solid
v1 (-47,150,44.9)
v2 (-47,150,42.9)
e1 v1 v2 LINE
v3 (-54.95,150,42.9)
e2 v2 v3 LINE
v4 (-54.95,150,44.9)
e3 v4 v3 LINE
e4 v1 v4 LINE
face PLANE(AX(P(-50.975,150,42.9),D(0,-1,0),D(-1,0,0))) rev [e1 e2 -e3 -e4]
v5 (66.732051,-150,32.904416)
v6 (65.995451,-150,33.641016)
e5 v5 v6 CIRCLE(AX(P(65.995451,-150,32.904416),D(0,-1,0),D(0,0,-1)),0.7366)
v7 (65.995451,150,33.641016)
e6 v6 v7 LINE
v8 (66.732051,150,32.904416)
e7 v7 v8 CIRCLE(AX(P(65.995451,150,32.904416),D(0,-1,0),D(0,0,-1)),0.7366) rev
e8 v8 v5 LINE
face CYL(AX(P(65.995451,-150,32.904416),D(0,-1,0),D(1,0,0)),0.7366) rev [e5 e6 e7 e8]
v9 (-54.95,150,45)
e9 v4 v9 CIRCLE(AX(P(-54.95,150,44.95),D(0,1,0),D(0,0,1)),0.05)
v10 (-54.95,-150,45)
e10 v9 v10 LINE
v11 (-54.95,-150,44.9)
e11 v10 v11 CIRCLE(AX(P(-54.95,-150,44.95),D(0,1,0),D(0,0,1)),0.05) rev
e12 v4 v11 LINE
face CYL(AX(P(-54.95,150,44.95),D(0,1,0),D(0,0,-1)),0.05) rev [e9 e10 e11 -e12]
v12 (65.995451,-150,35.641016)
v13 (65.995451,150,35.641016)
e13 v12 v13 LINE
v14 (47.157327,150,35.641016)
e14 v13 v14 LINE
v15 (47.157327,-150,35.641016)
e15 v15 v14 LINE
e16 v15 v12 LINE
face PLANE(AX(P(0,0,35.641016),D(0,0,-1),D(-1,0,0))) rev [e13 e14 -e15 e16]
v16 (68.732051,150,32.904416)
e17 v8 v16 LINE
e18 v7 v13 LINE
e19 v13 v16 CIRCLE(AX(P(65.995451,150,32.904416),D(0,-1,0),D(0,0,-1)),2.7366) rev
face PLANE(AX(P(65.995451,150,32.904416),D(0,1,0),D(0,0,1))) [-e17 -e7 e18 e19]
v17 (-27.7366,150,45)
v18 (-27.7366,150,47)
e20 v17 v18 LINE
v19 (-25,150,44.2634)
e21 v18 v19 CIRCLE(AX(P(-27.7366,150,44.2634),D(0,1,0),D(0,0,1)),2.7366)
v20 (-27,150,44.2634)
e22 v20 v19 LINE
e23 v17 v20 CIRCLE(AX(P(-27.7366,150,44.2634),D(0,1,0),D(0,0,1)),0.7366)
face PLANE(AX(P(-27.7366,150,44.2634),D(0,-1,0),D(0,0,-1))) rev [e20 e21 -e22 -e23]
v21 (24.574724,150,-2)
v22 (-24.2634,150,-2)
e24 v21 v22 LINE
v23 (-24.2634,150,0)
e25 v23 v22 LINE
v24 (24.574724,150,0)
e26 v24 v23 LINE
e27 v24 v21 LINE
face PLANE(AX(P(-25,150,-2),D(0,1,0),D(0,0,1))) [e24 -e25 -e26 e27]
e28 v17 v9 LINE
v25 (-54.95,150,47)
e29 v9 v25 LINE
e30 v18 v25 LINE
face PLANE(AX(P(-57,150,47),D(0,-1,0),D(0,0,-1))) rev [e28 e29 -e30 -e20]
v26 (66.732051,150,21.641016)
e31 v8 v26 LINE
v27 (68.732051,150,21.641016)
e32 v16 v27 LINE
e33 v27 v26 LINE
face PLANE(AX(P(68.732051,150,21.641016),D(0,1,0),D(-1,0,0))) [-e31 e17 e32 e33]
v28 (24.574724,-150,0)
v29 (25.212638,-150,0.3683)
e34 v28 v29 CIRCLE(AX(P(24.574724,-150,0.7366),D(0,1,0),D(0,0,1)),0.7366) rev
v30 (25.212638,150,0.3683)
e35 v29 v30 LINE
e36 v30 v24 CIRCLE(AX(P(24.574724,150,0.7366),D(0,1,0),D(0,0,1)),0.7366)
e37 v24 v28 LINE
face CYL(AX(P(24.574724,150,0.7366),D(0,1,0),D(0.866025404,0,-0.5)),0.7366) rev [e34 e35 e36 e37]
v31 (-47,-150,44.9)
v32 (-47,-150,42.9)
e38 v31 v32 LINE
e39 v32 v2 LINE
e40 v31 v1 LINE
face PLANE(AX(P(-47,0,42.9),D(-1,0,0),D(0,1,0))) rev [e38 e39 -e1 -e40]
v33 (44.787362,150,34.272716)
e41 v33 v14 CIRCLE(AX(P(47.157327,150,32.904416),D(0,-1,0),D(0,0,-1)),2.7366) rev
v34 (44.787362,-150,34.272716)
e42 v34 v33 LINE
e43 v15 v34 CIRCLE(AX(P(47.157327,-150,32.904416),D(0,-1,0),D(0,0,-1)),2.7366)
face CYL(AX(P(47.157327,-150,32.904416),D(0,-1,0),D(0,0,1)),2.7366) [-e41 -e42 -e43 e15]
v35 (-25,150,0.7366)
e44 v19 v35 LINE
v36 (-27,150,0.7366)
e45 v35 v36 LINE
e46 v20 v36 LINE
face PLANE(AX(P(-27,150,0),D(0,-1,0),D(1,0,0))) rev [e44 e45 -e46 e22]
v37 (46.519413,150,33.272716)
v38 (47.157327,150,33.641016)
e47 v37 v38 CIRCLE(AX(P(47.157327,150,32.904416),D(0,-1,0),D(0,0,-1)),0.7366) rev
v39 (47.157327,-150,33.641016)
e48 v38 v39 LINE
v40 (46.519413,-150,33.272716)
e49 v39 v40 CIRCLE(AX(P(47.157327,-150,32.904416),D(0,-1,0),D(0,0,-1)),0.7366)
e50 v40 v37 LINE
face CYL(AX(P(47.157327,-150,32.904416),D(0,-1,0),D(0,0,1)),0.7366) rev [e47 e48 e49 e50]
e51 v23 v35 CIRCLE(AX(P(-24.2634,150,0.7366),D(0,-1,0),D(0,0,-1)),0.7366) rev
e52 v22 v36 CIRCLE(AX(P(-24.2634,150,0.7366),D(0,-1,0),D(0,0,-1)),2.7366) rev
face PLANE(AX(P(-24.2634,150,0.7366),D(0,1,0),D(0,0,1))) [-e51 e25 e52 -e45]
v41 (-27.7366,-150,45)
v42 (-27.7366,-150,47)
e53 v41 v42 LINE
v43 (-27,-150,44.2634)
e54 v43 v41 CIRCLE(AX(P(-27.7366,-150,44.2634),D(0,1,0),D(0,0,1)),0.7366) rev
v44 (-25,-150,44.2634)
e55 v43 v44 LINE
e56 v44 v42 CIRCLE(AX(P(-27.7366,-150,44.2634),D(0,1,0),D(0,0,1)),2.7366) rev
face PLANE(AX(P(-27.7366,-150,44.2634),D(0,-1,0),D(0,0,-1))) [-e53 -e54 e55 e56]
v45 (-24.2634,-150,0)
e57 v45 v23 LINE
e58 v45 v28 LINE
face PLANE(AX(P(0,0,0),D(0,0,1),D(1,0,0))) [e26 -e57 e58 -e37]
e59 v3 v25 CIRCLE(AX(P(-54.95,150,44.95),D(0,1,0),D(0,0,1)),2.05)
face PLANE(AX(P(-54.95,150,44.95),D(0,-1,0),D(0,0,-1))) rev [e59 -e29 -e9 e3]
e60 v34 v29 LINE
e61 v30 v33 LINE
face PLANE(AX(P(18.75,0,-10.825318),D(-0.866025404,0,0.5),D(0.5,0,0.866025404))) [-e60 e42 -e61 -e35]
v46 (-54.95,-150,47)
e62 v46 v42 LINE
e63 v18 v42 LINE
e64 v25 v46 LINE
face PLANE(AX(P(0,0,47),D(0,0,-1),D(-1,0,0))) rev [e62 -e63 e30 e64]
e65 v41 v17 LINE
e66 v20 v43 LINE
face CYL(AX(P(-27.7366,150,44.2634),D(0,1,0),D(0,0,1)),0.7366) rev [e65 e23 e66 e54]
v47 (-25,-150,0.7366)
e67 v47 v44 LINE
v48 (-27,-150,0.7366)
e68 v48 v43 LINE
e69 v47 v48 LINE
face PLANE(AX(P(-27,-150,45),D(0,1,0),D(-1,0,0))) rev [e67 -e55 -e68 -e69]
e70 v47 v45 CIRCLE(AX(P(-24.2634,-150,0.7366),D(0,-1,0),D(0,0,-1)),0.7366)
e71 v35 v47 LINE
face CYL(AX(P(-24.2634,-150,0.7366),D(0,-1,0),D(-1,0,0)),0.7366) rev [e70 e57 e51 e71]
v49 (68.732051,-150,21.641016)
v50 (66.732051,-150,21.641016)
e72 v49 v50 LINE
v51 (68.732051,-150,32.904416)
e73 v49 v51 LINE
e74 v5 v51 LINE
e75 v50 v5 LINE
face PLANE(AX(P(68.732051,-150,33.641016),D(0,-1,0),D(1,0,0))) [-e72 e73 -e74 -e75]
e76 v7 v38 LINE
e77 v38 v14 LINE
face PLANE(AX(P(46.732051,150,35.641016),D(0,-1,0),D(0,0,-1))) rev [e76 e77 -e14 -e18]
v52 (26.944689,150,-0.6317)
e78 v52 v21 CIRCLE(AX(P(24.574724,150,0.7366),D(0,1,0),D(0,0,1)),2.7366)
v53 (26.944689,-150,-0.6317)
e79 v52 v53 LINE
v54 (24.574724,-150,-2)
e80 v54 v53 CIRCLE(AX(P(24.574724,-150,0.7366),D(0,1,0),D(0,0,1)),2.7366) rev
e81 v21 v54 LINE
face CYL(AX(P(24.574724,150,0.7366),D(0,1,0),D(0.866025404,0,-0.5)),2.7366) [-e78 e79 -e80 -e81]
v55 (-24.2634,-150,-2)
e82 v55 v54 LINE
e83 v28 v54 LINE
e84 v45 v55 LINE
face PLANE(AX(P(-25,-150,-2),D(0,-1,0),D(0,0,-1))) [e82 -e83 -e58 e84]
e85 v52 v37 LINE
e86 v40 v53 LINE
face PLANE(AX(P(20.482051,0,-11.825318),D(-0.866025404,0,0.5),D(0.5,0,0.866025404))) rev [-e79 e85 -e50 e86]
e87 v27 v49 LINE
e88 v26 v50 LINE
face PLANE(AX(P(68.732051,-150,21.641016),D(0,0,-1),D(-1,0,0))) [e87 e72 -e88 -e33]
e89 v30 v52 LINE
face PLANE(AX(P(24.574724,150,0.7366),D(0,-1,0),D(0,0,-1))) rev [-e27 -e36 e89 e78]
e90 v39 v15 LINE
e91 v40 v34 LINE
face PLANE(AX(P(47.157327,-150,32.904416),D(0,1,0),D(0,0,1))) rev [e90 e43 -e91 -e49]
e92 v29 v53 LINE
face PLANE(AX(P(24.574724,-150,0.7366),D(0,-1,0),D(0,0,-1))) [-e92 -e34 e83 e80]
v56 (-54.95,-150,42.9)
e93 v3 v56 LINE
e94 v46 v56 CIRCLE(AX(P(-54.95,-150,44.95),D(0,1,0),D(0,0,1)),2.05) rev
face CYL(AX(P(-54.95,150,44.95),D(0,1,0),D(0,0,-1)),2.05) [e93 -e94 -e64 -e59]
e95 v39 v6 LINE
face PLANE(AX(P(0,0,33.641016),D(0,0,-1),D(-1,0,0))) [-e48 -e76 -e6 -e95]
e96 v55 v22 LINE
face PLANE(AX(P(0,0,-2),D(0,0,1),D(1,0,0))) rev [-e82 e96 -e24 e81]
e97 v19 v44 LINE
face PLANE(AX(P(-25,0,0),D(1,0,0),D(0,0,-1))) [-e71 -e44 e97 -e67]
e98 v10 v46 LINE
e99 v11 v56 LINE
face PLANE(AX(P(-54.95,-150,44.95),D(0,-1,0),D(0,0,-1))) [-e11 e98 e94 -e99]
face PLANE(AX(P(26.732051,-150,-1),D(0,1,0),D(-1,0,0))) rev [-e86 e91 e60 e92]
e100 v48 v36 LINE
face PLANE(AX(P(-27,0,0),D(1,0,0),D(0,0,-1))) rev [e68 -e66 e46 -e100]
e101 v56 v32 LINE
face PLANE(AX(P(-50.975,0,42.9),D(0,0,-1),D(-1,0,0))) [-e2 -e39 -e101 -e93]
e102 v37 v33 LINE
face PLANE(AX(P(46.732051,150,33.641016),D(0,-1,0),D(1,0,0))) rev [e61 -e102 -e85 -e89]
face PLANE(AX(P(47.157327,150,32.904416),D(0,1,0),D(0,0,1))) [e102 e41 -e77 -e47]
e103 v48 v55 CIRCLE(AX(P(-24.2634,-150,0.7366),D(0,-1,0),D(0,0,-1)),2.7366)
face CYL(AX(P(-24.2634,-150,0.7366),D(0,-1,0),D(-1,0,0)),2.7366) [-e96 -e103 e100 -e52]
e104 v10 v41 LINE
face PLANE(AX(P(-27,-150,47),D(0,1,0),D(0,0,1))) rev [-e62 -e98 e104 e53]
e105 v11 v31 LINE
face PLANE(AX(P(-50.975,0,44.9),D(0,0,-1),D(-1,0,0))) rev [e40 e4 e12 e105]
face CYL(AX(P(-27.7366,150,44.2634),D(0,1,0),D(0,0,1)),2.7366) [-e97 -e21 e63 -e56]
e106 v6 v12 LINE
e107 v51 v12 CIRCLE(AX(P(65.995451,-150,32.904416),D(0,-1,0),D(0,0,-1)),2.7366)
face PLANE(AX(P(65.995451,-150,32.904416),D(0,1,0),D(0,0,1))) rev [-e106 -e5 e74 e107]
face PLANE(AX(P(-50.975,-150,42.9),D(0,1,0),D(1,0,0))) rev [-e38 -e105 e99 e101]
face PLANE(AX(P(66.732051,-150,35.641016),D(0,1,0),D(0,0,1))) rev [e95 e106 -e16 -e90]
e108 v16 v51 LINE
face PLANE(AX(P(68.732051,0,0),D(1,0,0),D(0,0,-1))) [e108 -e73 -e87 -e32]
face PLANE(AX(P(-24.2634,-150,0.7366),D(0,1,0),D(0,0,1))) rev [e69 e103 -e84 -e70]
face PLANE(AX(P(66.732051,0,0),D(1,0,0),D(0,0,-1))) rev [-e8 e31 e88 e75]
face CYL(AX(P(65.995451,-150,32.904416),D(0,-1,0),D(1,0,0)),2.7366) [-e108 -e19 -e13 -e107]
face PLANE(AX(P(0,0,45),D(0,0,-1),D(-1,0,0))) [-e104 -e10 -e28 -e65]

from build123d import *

# Parameters (mm, degrees)
SCHIZZO2_W                     = 50
SCHIZZO2_H                     = 300
BASE_FLANGIA2_DEPTH            = 2
BORDO_FLANGIA1_STRIP_W         = 9.4732
BORDO_FLANGIA1_STRIP_H         = 2
BORDO_FLANGIA1_STRIP_CUT_DEPTH = 300
BORDO_FLANGIA1_DEPTH           = 300
BORDO_FLANGIA2_STRIP_W         = 9.4732
BORDO_FLANGIA2_STRIP_H         = 2
BORDO_FLANGIA2_STRIP_CUT_DEPTH = 300
BORDO_FLANGIA2_DEPTH           = 300
BORDO_FLANGIA3_STRIP_CUT_DEPTH = 300
BORDO_FLANGIA3_DEPTH           = 300
BORDO_FLANGIA4_STRIP_CUT_DEPTH = 300
BORDO_FLANGIA4_DEPTH           = 300
BORDO_FLANGIA5_STRIP_W         = 9.4732
BORDO_FLANGIA5_STRIP_H         = 2
BORDO_FLANGIA5_STRIP_CUT_DEPTH = 300
BORDO_FLANGIA5_DEPTH           = 300
ORLO1_START                    = -150
ORLO1_DEPTH                    = 300
ORLO1_2_DEPTH                  = 300


# Read off the part's stored shape, not the designer's step: Orlo1
# Sheet-metal steps are written as plain solids
with BuildPart() as part:
    # Schizzo2 → Base-Flangia2 (new body)
    with BuildSketch(Plane.XY):
        Rectangle(SCHIZZO2_W, SCHIZZO2_H)
    extrude(amount=-BASE_FLANGIA2_DEPTH)

    # Bordo-Flangia1 strip (across the edge) → Bordo-Flangia1 strip cut (cut)
    with BuildSketch(Plane(origin=(-25, 150, 0), x_dir=(1, 0, 0), z_dir=(0, -1, 0))):
        with Locations((-4, -1)):
            Rectangle(BORDO_FLANGIA1_STRIP_W, BORDO_FLANGIA1_STRIP_H)
    extrude(amount=BORDO_FLANGIA1_STRIP_CUT_DEPTH, mode=Mode.SUBTRACT)

    # Bordo-Flangia1 section (across the edge) → Bordo-Flangia1 (add)
    with BuildSketch(Plane(origin=(-25, 150, 0), x_dir=(1, 0, 0), z_dir=(0, -1, 0))):
        with BuildLine():
            Line((-2, 0.7366), (-2, 45))
            Line((-2, 45), (0, 45))
            Line((0, 45), (0, 0.7366))
            ThreePointArc((0, 0.7366), (0.215745145, 0.215745145), (0.7366, 0))
            Line((0.7366, 0), (0.7366, -2))
            ThreePointArc((0.7366, -2), (-1.198468417, -1.198468417), (-2, 0.7366))
        make_face()
    extrude(amount=BORDO_FLANGIA1_DEPTH)

    # Bordo-Flangia2 strip (across the edge) → Bordo-Flangia2 strip cut (cut)
    with BuildSketch(Plane(origin=(-27, -150, 45), x_dir=(0, 0, -1), z_dir=(0, 1, 0))):
        with Locations((-4, -1)):
            Rectangle(BORDO_FLANGIA2_STRIP_W, BORDO_FLANGIA2_STRIP_H)
    extrude(amount=BORDO_FLANGIA2_STRIP_CUT_DEPTH, mode=Mode.SUBTRACT)

    # Bordo-Flangia2 section (across the edge) → Bordo-Flangia2 (add)
    with BuildSketch(Plane(origin=(-27, -150, 45), x_dir=(0, 0, -1), z_dir=(0, 1, 0))):
        with BuildLine():
            Line((-2, 0.7366), (-2, 30))
            Line((-2, 30), (0, 30))
            Line((0, 30), (0, 0.7366))
            ThreePointArc((0, 0.7366), (0.215745145, 0.215745145), (0.7366, 0))
            Line((0.7366, 0), (0.7366, -2))
            ThreePointArc((0.7366, -2), (-1.198468417, -1.198468417), (-2, 0.7366))
        make_face()
    extrude(amount=BORDO_FLANGIA2_DEPTH)

    # Bordo-Flangia3 strip (across the edge) → Bordo-Flangia3 strip cut (cut)
    with BuildSketch(Plane(origin=(25, -150, 0), x_dir=(-0.8660254037844364, 0, 0.5000000000000041), z_dir=(0, 1, 0))):
        Polygon((-8.835731855, 2.791911088), (-0.6317, -1.944688912), (0.3683, -0.212638104), (-7.835731855, 4.523961896), align=None)
    extrude(amount=BORDO_FLANGIA3_STRIP_CUT_DEPTH, mode=Mode.SUBTRACT)

    # Bordo-Flangia3 section (across the edge) → Bordo-Flangia3 (add)
    with BuildSketch(Plane(origin=(25, -150, 0), x_dir=(-0.8660254037844364, 0, 0.5000000000000041), z_dir=(0, 1, 0))):
        with BuildLine():
            Line((-2, 0.425276208), (-2, 40))
            Line((-2, 40), (0, 40))
            Line((0, 40), (0, 0.425276208))
            ThreePointArc((0, 0.425276208), (0.098685688, 0.056976208), (0.3683, -0.212638104))
            Line((0.3683, -0.212638104), (-0.6317, -1.944688912))
            ThreePointArc((-0.6317, -1.944688912), (-1.63336512, -0.943023792), (-2, 0.425276208))
        make_face()
    extrude(amount=BORDO_FLANGIA3_DEPTH)

    # Bordo-Flangia4 strip (across the edge) → Bordo-Flangia4 strip cut (cut)
    with BuildSketch(Plane(origin=(46.732050808, 150, 33.641016151), x_dir=(0, 0, -1), z_dir=(0, -1, 0))):
        Polygon((-8.835731855, 2.791911088), (-0.6317, -1.944688912), (0.3683, -0.212638104), (-7.835731855, 4.523961896), align=None)
    extrude(amount=BORDO_FLANGIA4_STRIP_CUT_DEPTH, mode=Mode.SUBTRACT)

    # Bordo-Flangia4 section (across the edge) → Bordo-Flangia4 (add)
    with BuildSketch(Plane(origin=(46.732050808, 150, 33.641016151), x_dir=(0, 0, -1), z_dir=(0, -1, 0))):
        with BuildLine():
            Line((-2, 0.425276208), (-2, 20))
            Line((-2, 20), (0, 20))
            Line((0, 20), (0, 0.425276208))
            ThreePointArc((0, 0.425276208), (0.098685688, 0.056976208), (0.3683, -0.212638104))
            Line((0.3683, -0.212638104), (-0.6317, -1.944688912))
            ThreePointArc((-0.6317, -1.944688912), (-1.63336512, -0.943023792), (-2, 0.425276208))
        make_face()
    extrude(amount=BORDO_FLANGIA4_DEPTH)

    # Bordo-Flangia5 strip (across the edge) → Bordo-Flangia5 strip cut (cut)
    with BuildSketch(Plane(origin=(66.732050808, 150, 33.641016151), x_dir=(-1, 0, 0), z_dir=(0, -1, 0))):
        with Locations((-4, -1)):
            Rectangle(BORDO_FLANGIA5_STRIP_W, BORDO_FLANGIA5_STRIP_H)
    extrude(amount=BORDO_FLANGIA5_STRIP_CUT_DEPTH, mode=Mode.SUBTRACT)

    # Bordo-Flangia5 section (across the edge) → Bordo-Flangia5 (add)
    with BuildSketch(Plane(origin=(66.732050808, 150, 33.641016151), x_dir=(-1, 0, 0), z_dir=(0, -1, 0))):
        with BuildLine():
            Line((-2, 0.7366), (-2, 12))
            Line((-2, 12), (0, 12))
            Line((0, 12), (0, 0.7366))
            ThreePointArc((0, 0.7366), (0.215745145, 0.215745145), (0.7366, 0))
            Line((0.7366, 0), (0.7366, -2))
            ThreePointArc((0.7366, -2), (-1.198468417, -1.198468417), (-2, 0.7366))
        make_face()
    extrude(amount=BORDO_FLANGIA5_DEPTH)

    # Orlo1 outline → Orlo1 (cut)
    with BuildSketch(Plane(origin=(0, 0, 0), x_dir=(1, 0, 0), z_dir=(0, 1, 0)).offset(ORLO1_START)):
        with BuildLine():
            ThreePointArc((-54.95, -47), (-56.381782106, -46.417140075), (-56.999390153, -45))
            Line((-56.999390153, -45), (-57, -45))
            Line((-57, -45), (-57, -47))
            Line((-57, -47), (-54.95, -47))
        make_face()
    extrude(amount=ORLO1_DEPTH, mode=Mode.SUBTRACT)

    # Orlo1 2 outline → Orlo1 2 (add)
    with BuildSketch(Plane(origin=(0, 0, 0), x_dir=(1, 0, 0), z_dir=(0, 1, 0)).offset(ORLO1_START)):
        with BuildLine():
            Line((-47, -44.9), (-47, -42.9))
            Line((-47, -42.9), (-54.95, -42.9))
            ThreePointArc((-54.95, -42.9), (-56.417140075, -43.518217894), (-56.999390153, -45))
            Line((-56.999390153, -45), (-54.95, -45))
            ThreePointArc((-54.95, -45), (-55, -44.95), (-54.95, -44.9))
            Line((-54.95, -44.9), (-47, -44.9))
        make_face()
    extrude(amount=ORLO1_2_DEPTH)


solid = part.part
